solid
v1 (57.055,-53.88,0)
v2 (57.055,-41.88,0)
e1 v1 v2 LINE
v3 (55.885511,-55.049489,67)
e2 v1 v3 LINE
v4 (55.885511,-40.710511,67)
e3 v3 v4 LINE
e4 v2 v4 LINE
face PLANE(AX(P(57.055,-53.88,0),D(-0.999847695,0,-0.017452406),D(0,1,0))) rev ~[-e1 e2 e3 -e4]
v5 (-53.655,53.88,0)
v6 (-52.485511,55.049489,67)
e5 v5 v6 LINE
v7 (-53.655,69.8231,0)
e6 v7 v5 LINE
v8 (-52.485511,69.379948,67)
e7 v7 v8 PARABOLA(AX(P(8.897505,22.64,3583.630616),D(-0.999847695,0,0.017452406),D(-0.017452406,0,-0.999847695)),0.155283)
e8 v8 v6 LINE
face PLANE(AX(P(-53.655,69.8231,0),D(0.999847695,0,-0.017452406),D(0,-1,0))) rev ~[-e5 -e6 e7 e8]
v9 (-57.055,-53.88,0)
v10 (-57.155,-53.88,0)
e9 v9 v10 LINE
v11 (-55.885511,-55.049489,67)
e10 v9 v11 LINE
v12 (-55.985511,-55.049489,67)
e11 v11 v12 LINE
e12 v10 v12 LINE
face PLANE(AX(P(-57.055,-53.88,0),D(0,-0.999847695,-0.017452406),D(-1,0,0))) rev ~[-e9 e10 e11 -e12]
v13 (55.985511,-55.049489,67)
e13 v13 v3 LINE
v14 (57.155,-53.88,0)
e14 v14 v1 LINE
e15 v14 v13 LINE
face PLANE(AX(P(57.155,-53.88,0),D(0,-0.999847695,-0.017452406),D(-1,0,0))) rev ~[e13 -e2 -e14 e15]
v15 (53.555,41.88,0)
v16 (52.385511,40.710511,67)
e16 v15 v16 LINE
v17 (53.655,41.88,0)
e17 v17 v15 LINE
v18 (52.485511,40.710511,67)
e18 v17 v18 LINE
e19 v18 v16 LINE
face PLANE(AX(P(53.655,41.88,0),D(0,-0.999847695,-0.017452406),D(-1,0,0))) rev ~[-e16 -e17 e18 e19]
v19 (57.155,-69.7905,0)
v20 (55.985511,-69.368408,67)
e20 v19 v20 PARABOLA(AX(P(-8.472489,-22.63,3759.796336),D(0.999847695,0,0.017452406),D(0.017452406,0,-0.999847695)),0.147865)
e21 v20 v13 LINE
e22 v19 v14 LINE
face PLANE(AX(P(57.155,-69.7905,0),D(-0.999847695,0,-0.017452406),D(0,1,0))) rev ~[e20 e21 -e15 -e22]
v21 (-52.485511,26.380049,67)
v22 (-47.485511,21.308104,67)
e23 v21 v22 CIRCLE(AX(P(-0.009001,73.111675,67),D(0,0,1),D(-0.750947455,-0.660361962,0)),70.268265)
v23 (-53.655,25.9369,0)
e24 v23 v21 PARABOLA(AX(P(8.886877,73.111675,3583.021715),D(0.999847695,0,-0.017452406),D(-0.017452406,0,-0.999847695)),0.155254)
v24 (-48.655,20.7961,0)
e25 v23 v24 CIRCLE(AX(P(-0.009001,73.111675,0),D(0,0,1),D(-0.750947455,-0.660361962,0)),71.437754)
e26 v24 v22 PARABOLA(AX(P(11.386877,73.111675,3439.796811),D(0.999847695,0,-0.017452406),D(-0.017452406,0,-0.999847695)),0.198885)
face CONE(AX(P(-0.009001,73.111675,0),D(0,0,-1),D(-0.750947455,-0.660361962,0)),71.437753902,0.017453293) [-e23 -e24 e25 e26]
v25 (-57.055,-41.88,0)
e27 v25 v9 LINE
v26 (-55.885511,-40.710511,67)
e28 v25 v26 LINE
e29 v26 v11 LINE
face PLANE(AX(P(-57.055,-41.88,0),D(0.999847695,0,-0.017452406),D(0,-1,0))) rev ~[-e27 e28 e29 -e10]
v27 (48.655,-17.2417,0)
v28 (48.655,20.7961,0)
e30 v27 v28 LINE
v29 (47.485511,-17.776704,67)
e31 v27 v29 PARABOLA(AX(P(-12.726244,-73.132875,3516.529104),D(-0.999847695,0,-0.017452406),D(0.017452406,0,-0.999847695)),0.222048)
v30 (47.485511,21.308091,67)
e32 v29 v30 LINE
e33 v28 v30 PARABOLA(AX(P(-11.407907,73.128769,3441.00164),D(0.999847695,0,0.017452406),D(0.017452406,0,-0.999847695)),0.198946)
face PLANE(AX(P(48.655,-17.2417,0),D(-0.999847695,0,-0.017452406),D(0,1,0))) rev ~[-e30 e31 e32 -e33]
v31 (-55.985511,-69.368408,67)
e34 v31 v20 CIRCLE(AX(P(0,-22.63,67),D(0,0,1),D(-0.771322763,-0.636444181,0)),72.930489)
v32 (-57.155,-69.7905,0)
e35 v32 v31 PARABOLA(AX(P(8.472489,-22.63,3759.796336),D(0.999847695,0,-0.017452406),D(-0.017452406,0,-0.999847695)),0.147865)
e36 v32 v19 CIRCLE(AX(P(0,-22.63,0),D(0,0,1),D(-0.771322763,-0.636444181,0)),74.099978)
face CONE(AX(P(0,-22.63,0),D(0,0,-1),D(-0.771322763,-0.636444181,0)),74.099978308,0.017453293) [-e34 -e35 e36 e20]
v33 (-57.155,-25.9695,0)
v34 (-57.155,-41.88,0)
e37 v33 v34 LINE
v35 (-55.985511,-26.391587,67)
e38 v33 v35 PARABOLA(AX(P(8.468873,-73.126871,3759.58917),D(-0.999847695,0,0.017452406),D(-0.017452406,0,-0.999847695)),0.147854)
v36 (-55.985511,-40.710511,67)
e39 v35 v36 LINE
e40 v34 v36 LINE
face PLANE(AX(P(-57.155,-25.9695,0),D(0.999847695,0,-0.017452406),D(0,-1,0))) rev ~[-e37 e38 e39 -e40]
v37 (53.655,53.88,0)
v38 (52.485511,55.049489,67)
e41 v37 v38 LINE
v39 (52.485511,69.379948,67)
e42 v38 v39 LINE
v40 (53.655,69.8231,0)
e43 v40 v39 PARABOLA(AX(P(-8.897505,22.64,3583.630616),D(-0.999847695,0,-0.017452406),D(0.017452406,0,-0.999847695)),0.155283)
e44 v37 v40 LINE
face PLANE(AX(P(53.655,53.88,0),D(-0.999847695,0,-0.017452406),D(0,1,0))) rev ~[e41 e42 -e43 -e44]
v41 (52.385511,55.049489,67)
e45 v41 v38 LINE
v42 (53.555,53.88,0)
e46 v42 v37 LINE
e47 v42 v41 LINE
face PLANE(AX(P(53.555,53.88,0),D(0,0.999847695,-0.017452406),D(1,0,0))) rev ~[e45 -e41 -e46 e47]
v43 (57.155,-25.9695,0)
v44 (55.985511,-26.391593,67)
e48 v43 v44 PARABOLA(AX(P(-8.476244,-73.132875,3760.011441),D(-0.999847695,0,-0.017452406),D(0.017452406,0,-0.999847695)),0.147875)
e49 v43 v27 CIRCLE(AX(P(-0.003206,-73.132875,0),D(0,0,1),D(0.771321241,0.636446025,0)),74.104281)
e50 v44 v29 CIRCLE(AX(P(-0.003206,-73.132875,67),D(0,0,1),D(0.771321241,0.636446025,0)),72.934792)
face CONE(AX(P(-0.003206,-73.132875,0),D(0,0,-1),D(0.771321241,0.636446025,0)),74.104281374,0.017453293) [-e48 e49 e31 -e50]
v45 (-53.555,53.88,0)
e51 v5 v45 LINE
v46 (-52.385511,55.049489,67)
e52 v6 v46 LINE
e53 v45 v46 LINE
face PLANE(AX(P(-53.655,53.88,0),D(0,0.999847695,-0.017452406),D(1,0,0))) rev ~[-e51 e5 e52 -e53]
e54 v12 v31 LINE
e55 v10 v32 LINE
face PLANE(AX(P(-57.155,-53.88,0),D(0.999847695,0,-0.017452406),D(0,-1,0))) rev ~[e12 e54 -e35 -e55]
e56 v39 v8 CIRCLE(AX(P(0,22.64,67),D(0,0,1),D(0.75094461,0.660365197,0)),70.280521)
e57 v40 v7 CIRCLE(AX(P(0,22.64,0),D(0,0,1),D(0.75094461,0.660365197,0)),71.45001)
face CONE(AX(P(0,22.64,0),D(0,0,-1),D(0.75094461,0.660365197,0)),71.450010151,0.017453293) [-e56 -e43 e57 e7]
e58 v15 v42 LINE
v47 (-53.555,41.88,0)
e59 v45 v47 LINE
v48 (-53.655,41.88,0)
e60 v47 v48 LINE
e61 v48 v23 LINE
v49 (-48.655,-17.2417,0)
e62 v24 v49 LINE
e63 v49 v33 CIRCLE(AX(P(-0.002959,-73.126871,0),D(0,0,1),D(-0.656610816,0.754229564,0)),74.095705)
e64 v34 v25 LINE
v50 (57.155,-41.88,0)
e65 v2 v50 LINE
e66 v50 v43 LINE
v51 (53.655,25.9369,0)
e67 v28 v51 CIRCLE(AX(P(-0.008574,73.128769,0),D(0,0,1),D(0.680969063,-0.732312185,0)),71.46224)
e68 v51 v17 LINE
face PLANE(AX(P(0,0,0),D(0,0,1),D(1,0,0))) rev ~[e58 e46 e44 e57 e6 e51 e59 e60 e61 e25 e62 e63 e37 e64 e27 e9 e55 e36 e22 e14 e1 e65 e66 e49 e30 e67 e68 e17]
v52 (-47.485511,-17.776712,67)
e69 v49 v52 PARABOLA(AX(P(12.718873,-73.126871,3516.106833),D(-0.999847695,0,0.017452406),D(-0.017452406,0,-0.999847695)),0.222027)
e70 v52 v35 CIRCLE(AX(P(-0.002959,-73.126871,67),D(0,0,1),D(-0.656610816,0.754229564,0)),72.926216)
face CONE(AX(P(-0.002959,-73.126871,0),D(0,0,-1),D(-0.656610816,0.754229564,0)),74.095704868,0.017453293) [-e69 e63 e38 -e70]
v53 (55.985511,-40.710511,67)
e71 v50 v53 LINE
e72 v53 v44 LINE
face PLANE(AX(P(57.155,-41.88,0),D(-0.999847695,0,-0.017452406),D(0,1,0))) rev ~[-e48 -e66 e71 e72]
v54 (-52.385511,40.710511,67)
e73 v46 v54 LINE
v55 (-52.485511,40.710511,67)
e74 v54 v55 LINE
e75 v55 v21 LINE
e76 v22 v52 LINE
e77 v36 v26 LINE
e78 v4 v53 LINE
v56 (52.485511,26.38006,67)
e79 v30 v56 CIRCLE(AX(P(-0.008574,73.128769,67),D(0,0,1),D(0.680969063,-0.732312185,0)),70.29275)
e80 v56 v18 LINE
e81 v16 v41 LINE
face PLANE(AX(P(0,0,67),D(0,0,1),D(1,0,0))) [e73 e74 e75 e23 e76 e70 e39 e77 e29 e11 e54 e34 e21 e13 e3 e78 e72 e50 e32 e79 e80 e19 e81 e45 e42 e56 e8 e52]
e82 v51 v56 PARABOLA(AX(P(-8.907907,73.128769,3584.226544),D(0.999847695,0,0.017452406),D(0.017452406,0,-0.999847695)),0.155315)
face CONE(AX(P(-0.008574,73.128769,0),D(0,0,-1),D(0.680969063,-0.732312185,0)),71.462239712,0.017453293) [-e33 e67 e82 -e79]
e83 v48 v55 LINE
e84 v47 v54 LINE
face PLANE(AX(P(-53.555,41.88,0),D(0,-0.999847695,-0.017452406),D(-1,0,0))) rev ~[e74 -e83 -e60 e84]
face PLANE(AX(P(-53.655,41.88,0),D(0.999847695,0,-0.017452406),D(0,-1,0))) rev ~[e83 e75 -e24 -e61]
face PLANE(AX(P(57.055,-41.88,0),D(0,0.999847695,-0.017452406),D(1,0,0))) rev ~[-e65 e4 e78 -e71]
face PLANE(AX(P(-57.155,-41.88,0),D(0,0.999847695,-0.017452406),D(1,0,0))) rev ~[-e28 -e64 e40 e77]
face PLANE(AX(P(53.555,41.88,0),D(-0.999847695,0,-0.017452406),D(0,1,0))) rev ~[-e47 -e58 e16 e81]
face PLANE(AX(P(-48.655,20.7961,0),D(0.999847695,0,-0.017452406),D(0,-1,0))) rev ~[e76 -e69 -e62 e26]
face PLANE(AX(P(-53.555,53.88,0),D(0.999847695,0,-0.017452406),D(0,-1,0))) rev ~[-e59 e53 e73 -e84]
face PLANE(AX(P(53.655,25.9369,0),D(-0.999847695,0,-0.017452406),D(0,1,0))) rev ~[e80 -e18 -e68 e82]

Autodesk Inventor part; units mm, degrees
sketch "Skizze_1" plane through (0, 0, 0) normal (0, 0, 1) x (1, 0, 0)
  line L0 (-57.155, -41.88) -> (-57.055, -41.88)
  line L1 (-57.055, -41.88) -> (-57.055, -53.88)
  line L2 (-57.055, -53.88) -> (-57.155, -53.88)
  line L3 (-57.155, -53.88) -> (-57.155, -69.7905)
  arc A0 (-57.155, -69.7905) -> (57.155, -69.7905) centre (0, -22.63) ccw
  line L4 (57.155, -69.7905) -> (57.155, -53.88)
  line L5 (57.155, -53.88) -> (57.055, -53.88)
  line L6 (57.055, -53.88) -> (57.055, -41.88)
  line L7 (57.055, -41.88) -> (57.155, -41.88)
  line L8 (57.155, -41.88) -> (57.155, -25.9695)
  arc A1 (57.155, -25.9695) -> (48.655, -17.2417) centre (0, -73.13) ccw
  line L9 (48.655, -17.2417) -> (48.655, 20.7961)
  arc A2 (48.655, 20.7961) -> (53.655, 25.9369) centre (0, 73.12) ccw
  line L10 (53.655, 25.9369) -> (53.655, 41.88)
  line L11 (53.655, 41.88) -> (53.555, 41.88)
  line L12 (53.555, 41.88) -> (53.555, 53.88)
  line L13 (53.555, 53.88) -> (53.655, 53.88)
  line L14 (53.655, 53.88) -> (53.655, 69.8231)
  arc A3 (53.655, 69.8231) -> (-53.655, 69.8231) centre (0, 22.64) ccw
  line L15 (-53.655, 69.8231) -> (-53.655, 53.88)
  line L16 (-53.655, 53.88) -> (-53.555, 53.88)
  line L17 (-53.555, 53.88) -> (-53.555, 41.88)
  line L18 (-53.555, 41.88) -> (-53.655, 41.88)
  line L19 (-53.655, 41.88) -> (-53.655, 25.9369)
  arc A4 (-53.655, 25.9369) -> (-48.655, 20.7961) centre (0, 73.12) ccw
  line L20 (-48.655, 20.7961) -> (-48.655, -17.2417)
  arc A5 (-48.655, -17.2417) -> (-57.155, -25.9695) centre (0, -73.13) ccw
  line L21 (-57.155, -25.9695) -> (-57.155, -41.88)
extrude "Extrusion1" add sketch "Skizze_1" along normal blind 67 draft -1
ref_plane "EPDOPPELNUT2_XY" through (0, 47.88, 0) normal (0, 0, 1) x (1, 0, 0)
ref_plane "EPDOPPELNUT2_YZ" through (0, 47.88, 0) normal (1, 0, 0) x (0, 1, 0)
ref_plane "EPDOPPELNUT2_ZX" through (0, 47.88, 0) normal (0, 1, 0) x (0, 0, 1)
ref_plane "EPDOPPROFIL_XY" through (0, 47.88, 67) normal (0, 0, 1) x (1, 0, 0)
ref_plane "EPDOPPROFIL_YZ" through (0, 47.88, 67) normal (1, 0, 0) x (0, 1, 0)
ref_plane "EPDOPPROFIL_ZX" through (0, 47.88, 67) normal (0, 1, 0) x (0, 0, 1)
ref_plane "EPFUNKTIONSPR2_XY" through (0, -47.88, 0) normal (0, 0, 1) x (1, 0, 0)
ref_plane "EPFUNKTIONSPR2_YZ" through (0, -47.88, 0) normal (1, 0, 0) x (0, 1, 0)
ref_plane "EPFUNKTIONSPR2_ZX" through (0, -47.88, 0) normal (0, 1, 0) x (0, 0, 1)
ref_plane "EPKONPROFIL_XY" through (0, -47.88, 67) normal (0, 0, 1) x (1, 0, 0)
ref_plane "EPKONPROFIL_YZ" through (0, -47.88, 67) normal (1, 0, 0) x (0, 1, 0)
ref_plane "EPKONPROFIL_ZX" through (0, -47.88, 67) normal (0, 1, 0) x (0, 0, 1)
properties part number "LZ80_Gehaeuse_Parallelform"
